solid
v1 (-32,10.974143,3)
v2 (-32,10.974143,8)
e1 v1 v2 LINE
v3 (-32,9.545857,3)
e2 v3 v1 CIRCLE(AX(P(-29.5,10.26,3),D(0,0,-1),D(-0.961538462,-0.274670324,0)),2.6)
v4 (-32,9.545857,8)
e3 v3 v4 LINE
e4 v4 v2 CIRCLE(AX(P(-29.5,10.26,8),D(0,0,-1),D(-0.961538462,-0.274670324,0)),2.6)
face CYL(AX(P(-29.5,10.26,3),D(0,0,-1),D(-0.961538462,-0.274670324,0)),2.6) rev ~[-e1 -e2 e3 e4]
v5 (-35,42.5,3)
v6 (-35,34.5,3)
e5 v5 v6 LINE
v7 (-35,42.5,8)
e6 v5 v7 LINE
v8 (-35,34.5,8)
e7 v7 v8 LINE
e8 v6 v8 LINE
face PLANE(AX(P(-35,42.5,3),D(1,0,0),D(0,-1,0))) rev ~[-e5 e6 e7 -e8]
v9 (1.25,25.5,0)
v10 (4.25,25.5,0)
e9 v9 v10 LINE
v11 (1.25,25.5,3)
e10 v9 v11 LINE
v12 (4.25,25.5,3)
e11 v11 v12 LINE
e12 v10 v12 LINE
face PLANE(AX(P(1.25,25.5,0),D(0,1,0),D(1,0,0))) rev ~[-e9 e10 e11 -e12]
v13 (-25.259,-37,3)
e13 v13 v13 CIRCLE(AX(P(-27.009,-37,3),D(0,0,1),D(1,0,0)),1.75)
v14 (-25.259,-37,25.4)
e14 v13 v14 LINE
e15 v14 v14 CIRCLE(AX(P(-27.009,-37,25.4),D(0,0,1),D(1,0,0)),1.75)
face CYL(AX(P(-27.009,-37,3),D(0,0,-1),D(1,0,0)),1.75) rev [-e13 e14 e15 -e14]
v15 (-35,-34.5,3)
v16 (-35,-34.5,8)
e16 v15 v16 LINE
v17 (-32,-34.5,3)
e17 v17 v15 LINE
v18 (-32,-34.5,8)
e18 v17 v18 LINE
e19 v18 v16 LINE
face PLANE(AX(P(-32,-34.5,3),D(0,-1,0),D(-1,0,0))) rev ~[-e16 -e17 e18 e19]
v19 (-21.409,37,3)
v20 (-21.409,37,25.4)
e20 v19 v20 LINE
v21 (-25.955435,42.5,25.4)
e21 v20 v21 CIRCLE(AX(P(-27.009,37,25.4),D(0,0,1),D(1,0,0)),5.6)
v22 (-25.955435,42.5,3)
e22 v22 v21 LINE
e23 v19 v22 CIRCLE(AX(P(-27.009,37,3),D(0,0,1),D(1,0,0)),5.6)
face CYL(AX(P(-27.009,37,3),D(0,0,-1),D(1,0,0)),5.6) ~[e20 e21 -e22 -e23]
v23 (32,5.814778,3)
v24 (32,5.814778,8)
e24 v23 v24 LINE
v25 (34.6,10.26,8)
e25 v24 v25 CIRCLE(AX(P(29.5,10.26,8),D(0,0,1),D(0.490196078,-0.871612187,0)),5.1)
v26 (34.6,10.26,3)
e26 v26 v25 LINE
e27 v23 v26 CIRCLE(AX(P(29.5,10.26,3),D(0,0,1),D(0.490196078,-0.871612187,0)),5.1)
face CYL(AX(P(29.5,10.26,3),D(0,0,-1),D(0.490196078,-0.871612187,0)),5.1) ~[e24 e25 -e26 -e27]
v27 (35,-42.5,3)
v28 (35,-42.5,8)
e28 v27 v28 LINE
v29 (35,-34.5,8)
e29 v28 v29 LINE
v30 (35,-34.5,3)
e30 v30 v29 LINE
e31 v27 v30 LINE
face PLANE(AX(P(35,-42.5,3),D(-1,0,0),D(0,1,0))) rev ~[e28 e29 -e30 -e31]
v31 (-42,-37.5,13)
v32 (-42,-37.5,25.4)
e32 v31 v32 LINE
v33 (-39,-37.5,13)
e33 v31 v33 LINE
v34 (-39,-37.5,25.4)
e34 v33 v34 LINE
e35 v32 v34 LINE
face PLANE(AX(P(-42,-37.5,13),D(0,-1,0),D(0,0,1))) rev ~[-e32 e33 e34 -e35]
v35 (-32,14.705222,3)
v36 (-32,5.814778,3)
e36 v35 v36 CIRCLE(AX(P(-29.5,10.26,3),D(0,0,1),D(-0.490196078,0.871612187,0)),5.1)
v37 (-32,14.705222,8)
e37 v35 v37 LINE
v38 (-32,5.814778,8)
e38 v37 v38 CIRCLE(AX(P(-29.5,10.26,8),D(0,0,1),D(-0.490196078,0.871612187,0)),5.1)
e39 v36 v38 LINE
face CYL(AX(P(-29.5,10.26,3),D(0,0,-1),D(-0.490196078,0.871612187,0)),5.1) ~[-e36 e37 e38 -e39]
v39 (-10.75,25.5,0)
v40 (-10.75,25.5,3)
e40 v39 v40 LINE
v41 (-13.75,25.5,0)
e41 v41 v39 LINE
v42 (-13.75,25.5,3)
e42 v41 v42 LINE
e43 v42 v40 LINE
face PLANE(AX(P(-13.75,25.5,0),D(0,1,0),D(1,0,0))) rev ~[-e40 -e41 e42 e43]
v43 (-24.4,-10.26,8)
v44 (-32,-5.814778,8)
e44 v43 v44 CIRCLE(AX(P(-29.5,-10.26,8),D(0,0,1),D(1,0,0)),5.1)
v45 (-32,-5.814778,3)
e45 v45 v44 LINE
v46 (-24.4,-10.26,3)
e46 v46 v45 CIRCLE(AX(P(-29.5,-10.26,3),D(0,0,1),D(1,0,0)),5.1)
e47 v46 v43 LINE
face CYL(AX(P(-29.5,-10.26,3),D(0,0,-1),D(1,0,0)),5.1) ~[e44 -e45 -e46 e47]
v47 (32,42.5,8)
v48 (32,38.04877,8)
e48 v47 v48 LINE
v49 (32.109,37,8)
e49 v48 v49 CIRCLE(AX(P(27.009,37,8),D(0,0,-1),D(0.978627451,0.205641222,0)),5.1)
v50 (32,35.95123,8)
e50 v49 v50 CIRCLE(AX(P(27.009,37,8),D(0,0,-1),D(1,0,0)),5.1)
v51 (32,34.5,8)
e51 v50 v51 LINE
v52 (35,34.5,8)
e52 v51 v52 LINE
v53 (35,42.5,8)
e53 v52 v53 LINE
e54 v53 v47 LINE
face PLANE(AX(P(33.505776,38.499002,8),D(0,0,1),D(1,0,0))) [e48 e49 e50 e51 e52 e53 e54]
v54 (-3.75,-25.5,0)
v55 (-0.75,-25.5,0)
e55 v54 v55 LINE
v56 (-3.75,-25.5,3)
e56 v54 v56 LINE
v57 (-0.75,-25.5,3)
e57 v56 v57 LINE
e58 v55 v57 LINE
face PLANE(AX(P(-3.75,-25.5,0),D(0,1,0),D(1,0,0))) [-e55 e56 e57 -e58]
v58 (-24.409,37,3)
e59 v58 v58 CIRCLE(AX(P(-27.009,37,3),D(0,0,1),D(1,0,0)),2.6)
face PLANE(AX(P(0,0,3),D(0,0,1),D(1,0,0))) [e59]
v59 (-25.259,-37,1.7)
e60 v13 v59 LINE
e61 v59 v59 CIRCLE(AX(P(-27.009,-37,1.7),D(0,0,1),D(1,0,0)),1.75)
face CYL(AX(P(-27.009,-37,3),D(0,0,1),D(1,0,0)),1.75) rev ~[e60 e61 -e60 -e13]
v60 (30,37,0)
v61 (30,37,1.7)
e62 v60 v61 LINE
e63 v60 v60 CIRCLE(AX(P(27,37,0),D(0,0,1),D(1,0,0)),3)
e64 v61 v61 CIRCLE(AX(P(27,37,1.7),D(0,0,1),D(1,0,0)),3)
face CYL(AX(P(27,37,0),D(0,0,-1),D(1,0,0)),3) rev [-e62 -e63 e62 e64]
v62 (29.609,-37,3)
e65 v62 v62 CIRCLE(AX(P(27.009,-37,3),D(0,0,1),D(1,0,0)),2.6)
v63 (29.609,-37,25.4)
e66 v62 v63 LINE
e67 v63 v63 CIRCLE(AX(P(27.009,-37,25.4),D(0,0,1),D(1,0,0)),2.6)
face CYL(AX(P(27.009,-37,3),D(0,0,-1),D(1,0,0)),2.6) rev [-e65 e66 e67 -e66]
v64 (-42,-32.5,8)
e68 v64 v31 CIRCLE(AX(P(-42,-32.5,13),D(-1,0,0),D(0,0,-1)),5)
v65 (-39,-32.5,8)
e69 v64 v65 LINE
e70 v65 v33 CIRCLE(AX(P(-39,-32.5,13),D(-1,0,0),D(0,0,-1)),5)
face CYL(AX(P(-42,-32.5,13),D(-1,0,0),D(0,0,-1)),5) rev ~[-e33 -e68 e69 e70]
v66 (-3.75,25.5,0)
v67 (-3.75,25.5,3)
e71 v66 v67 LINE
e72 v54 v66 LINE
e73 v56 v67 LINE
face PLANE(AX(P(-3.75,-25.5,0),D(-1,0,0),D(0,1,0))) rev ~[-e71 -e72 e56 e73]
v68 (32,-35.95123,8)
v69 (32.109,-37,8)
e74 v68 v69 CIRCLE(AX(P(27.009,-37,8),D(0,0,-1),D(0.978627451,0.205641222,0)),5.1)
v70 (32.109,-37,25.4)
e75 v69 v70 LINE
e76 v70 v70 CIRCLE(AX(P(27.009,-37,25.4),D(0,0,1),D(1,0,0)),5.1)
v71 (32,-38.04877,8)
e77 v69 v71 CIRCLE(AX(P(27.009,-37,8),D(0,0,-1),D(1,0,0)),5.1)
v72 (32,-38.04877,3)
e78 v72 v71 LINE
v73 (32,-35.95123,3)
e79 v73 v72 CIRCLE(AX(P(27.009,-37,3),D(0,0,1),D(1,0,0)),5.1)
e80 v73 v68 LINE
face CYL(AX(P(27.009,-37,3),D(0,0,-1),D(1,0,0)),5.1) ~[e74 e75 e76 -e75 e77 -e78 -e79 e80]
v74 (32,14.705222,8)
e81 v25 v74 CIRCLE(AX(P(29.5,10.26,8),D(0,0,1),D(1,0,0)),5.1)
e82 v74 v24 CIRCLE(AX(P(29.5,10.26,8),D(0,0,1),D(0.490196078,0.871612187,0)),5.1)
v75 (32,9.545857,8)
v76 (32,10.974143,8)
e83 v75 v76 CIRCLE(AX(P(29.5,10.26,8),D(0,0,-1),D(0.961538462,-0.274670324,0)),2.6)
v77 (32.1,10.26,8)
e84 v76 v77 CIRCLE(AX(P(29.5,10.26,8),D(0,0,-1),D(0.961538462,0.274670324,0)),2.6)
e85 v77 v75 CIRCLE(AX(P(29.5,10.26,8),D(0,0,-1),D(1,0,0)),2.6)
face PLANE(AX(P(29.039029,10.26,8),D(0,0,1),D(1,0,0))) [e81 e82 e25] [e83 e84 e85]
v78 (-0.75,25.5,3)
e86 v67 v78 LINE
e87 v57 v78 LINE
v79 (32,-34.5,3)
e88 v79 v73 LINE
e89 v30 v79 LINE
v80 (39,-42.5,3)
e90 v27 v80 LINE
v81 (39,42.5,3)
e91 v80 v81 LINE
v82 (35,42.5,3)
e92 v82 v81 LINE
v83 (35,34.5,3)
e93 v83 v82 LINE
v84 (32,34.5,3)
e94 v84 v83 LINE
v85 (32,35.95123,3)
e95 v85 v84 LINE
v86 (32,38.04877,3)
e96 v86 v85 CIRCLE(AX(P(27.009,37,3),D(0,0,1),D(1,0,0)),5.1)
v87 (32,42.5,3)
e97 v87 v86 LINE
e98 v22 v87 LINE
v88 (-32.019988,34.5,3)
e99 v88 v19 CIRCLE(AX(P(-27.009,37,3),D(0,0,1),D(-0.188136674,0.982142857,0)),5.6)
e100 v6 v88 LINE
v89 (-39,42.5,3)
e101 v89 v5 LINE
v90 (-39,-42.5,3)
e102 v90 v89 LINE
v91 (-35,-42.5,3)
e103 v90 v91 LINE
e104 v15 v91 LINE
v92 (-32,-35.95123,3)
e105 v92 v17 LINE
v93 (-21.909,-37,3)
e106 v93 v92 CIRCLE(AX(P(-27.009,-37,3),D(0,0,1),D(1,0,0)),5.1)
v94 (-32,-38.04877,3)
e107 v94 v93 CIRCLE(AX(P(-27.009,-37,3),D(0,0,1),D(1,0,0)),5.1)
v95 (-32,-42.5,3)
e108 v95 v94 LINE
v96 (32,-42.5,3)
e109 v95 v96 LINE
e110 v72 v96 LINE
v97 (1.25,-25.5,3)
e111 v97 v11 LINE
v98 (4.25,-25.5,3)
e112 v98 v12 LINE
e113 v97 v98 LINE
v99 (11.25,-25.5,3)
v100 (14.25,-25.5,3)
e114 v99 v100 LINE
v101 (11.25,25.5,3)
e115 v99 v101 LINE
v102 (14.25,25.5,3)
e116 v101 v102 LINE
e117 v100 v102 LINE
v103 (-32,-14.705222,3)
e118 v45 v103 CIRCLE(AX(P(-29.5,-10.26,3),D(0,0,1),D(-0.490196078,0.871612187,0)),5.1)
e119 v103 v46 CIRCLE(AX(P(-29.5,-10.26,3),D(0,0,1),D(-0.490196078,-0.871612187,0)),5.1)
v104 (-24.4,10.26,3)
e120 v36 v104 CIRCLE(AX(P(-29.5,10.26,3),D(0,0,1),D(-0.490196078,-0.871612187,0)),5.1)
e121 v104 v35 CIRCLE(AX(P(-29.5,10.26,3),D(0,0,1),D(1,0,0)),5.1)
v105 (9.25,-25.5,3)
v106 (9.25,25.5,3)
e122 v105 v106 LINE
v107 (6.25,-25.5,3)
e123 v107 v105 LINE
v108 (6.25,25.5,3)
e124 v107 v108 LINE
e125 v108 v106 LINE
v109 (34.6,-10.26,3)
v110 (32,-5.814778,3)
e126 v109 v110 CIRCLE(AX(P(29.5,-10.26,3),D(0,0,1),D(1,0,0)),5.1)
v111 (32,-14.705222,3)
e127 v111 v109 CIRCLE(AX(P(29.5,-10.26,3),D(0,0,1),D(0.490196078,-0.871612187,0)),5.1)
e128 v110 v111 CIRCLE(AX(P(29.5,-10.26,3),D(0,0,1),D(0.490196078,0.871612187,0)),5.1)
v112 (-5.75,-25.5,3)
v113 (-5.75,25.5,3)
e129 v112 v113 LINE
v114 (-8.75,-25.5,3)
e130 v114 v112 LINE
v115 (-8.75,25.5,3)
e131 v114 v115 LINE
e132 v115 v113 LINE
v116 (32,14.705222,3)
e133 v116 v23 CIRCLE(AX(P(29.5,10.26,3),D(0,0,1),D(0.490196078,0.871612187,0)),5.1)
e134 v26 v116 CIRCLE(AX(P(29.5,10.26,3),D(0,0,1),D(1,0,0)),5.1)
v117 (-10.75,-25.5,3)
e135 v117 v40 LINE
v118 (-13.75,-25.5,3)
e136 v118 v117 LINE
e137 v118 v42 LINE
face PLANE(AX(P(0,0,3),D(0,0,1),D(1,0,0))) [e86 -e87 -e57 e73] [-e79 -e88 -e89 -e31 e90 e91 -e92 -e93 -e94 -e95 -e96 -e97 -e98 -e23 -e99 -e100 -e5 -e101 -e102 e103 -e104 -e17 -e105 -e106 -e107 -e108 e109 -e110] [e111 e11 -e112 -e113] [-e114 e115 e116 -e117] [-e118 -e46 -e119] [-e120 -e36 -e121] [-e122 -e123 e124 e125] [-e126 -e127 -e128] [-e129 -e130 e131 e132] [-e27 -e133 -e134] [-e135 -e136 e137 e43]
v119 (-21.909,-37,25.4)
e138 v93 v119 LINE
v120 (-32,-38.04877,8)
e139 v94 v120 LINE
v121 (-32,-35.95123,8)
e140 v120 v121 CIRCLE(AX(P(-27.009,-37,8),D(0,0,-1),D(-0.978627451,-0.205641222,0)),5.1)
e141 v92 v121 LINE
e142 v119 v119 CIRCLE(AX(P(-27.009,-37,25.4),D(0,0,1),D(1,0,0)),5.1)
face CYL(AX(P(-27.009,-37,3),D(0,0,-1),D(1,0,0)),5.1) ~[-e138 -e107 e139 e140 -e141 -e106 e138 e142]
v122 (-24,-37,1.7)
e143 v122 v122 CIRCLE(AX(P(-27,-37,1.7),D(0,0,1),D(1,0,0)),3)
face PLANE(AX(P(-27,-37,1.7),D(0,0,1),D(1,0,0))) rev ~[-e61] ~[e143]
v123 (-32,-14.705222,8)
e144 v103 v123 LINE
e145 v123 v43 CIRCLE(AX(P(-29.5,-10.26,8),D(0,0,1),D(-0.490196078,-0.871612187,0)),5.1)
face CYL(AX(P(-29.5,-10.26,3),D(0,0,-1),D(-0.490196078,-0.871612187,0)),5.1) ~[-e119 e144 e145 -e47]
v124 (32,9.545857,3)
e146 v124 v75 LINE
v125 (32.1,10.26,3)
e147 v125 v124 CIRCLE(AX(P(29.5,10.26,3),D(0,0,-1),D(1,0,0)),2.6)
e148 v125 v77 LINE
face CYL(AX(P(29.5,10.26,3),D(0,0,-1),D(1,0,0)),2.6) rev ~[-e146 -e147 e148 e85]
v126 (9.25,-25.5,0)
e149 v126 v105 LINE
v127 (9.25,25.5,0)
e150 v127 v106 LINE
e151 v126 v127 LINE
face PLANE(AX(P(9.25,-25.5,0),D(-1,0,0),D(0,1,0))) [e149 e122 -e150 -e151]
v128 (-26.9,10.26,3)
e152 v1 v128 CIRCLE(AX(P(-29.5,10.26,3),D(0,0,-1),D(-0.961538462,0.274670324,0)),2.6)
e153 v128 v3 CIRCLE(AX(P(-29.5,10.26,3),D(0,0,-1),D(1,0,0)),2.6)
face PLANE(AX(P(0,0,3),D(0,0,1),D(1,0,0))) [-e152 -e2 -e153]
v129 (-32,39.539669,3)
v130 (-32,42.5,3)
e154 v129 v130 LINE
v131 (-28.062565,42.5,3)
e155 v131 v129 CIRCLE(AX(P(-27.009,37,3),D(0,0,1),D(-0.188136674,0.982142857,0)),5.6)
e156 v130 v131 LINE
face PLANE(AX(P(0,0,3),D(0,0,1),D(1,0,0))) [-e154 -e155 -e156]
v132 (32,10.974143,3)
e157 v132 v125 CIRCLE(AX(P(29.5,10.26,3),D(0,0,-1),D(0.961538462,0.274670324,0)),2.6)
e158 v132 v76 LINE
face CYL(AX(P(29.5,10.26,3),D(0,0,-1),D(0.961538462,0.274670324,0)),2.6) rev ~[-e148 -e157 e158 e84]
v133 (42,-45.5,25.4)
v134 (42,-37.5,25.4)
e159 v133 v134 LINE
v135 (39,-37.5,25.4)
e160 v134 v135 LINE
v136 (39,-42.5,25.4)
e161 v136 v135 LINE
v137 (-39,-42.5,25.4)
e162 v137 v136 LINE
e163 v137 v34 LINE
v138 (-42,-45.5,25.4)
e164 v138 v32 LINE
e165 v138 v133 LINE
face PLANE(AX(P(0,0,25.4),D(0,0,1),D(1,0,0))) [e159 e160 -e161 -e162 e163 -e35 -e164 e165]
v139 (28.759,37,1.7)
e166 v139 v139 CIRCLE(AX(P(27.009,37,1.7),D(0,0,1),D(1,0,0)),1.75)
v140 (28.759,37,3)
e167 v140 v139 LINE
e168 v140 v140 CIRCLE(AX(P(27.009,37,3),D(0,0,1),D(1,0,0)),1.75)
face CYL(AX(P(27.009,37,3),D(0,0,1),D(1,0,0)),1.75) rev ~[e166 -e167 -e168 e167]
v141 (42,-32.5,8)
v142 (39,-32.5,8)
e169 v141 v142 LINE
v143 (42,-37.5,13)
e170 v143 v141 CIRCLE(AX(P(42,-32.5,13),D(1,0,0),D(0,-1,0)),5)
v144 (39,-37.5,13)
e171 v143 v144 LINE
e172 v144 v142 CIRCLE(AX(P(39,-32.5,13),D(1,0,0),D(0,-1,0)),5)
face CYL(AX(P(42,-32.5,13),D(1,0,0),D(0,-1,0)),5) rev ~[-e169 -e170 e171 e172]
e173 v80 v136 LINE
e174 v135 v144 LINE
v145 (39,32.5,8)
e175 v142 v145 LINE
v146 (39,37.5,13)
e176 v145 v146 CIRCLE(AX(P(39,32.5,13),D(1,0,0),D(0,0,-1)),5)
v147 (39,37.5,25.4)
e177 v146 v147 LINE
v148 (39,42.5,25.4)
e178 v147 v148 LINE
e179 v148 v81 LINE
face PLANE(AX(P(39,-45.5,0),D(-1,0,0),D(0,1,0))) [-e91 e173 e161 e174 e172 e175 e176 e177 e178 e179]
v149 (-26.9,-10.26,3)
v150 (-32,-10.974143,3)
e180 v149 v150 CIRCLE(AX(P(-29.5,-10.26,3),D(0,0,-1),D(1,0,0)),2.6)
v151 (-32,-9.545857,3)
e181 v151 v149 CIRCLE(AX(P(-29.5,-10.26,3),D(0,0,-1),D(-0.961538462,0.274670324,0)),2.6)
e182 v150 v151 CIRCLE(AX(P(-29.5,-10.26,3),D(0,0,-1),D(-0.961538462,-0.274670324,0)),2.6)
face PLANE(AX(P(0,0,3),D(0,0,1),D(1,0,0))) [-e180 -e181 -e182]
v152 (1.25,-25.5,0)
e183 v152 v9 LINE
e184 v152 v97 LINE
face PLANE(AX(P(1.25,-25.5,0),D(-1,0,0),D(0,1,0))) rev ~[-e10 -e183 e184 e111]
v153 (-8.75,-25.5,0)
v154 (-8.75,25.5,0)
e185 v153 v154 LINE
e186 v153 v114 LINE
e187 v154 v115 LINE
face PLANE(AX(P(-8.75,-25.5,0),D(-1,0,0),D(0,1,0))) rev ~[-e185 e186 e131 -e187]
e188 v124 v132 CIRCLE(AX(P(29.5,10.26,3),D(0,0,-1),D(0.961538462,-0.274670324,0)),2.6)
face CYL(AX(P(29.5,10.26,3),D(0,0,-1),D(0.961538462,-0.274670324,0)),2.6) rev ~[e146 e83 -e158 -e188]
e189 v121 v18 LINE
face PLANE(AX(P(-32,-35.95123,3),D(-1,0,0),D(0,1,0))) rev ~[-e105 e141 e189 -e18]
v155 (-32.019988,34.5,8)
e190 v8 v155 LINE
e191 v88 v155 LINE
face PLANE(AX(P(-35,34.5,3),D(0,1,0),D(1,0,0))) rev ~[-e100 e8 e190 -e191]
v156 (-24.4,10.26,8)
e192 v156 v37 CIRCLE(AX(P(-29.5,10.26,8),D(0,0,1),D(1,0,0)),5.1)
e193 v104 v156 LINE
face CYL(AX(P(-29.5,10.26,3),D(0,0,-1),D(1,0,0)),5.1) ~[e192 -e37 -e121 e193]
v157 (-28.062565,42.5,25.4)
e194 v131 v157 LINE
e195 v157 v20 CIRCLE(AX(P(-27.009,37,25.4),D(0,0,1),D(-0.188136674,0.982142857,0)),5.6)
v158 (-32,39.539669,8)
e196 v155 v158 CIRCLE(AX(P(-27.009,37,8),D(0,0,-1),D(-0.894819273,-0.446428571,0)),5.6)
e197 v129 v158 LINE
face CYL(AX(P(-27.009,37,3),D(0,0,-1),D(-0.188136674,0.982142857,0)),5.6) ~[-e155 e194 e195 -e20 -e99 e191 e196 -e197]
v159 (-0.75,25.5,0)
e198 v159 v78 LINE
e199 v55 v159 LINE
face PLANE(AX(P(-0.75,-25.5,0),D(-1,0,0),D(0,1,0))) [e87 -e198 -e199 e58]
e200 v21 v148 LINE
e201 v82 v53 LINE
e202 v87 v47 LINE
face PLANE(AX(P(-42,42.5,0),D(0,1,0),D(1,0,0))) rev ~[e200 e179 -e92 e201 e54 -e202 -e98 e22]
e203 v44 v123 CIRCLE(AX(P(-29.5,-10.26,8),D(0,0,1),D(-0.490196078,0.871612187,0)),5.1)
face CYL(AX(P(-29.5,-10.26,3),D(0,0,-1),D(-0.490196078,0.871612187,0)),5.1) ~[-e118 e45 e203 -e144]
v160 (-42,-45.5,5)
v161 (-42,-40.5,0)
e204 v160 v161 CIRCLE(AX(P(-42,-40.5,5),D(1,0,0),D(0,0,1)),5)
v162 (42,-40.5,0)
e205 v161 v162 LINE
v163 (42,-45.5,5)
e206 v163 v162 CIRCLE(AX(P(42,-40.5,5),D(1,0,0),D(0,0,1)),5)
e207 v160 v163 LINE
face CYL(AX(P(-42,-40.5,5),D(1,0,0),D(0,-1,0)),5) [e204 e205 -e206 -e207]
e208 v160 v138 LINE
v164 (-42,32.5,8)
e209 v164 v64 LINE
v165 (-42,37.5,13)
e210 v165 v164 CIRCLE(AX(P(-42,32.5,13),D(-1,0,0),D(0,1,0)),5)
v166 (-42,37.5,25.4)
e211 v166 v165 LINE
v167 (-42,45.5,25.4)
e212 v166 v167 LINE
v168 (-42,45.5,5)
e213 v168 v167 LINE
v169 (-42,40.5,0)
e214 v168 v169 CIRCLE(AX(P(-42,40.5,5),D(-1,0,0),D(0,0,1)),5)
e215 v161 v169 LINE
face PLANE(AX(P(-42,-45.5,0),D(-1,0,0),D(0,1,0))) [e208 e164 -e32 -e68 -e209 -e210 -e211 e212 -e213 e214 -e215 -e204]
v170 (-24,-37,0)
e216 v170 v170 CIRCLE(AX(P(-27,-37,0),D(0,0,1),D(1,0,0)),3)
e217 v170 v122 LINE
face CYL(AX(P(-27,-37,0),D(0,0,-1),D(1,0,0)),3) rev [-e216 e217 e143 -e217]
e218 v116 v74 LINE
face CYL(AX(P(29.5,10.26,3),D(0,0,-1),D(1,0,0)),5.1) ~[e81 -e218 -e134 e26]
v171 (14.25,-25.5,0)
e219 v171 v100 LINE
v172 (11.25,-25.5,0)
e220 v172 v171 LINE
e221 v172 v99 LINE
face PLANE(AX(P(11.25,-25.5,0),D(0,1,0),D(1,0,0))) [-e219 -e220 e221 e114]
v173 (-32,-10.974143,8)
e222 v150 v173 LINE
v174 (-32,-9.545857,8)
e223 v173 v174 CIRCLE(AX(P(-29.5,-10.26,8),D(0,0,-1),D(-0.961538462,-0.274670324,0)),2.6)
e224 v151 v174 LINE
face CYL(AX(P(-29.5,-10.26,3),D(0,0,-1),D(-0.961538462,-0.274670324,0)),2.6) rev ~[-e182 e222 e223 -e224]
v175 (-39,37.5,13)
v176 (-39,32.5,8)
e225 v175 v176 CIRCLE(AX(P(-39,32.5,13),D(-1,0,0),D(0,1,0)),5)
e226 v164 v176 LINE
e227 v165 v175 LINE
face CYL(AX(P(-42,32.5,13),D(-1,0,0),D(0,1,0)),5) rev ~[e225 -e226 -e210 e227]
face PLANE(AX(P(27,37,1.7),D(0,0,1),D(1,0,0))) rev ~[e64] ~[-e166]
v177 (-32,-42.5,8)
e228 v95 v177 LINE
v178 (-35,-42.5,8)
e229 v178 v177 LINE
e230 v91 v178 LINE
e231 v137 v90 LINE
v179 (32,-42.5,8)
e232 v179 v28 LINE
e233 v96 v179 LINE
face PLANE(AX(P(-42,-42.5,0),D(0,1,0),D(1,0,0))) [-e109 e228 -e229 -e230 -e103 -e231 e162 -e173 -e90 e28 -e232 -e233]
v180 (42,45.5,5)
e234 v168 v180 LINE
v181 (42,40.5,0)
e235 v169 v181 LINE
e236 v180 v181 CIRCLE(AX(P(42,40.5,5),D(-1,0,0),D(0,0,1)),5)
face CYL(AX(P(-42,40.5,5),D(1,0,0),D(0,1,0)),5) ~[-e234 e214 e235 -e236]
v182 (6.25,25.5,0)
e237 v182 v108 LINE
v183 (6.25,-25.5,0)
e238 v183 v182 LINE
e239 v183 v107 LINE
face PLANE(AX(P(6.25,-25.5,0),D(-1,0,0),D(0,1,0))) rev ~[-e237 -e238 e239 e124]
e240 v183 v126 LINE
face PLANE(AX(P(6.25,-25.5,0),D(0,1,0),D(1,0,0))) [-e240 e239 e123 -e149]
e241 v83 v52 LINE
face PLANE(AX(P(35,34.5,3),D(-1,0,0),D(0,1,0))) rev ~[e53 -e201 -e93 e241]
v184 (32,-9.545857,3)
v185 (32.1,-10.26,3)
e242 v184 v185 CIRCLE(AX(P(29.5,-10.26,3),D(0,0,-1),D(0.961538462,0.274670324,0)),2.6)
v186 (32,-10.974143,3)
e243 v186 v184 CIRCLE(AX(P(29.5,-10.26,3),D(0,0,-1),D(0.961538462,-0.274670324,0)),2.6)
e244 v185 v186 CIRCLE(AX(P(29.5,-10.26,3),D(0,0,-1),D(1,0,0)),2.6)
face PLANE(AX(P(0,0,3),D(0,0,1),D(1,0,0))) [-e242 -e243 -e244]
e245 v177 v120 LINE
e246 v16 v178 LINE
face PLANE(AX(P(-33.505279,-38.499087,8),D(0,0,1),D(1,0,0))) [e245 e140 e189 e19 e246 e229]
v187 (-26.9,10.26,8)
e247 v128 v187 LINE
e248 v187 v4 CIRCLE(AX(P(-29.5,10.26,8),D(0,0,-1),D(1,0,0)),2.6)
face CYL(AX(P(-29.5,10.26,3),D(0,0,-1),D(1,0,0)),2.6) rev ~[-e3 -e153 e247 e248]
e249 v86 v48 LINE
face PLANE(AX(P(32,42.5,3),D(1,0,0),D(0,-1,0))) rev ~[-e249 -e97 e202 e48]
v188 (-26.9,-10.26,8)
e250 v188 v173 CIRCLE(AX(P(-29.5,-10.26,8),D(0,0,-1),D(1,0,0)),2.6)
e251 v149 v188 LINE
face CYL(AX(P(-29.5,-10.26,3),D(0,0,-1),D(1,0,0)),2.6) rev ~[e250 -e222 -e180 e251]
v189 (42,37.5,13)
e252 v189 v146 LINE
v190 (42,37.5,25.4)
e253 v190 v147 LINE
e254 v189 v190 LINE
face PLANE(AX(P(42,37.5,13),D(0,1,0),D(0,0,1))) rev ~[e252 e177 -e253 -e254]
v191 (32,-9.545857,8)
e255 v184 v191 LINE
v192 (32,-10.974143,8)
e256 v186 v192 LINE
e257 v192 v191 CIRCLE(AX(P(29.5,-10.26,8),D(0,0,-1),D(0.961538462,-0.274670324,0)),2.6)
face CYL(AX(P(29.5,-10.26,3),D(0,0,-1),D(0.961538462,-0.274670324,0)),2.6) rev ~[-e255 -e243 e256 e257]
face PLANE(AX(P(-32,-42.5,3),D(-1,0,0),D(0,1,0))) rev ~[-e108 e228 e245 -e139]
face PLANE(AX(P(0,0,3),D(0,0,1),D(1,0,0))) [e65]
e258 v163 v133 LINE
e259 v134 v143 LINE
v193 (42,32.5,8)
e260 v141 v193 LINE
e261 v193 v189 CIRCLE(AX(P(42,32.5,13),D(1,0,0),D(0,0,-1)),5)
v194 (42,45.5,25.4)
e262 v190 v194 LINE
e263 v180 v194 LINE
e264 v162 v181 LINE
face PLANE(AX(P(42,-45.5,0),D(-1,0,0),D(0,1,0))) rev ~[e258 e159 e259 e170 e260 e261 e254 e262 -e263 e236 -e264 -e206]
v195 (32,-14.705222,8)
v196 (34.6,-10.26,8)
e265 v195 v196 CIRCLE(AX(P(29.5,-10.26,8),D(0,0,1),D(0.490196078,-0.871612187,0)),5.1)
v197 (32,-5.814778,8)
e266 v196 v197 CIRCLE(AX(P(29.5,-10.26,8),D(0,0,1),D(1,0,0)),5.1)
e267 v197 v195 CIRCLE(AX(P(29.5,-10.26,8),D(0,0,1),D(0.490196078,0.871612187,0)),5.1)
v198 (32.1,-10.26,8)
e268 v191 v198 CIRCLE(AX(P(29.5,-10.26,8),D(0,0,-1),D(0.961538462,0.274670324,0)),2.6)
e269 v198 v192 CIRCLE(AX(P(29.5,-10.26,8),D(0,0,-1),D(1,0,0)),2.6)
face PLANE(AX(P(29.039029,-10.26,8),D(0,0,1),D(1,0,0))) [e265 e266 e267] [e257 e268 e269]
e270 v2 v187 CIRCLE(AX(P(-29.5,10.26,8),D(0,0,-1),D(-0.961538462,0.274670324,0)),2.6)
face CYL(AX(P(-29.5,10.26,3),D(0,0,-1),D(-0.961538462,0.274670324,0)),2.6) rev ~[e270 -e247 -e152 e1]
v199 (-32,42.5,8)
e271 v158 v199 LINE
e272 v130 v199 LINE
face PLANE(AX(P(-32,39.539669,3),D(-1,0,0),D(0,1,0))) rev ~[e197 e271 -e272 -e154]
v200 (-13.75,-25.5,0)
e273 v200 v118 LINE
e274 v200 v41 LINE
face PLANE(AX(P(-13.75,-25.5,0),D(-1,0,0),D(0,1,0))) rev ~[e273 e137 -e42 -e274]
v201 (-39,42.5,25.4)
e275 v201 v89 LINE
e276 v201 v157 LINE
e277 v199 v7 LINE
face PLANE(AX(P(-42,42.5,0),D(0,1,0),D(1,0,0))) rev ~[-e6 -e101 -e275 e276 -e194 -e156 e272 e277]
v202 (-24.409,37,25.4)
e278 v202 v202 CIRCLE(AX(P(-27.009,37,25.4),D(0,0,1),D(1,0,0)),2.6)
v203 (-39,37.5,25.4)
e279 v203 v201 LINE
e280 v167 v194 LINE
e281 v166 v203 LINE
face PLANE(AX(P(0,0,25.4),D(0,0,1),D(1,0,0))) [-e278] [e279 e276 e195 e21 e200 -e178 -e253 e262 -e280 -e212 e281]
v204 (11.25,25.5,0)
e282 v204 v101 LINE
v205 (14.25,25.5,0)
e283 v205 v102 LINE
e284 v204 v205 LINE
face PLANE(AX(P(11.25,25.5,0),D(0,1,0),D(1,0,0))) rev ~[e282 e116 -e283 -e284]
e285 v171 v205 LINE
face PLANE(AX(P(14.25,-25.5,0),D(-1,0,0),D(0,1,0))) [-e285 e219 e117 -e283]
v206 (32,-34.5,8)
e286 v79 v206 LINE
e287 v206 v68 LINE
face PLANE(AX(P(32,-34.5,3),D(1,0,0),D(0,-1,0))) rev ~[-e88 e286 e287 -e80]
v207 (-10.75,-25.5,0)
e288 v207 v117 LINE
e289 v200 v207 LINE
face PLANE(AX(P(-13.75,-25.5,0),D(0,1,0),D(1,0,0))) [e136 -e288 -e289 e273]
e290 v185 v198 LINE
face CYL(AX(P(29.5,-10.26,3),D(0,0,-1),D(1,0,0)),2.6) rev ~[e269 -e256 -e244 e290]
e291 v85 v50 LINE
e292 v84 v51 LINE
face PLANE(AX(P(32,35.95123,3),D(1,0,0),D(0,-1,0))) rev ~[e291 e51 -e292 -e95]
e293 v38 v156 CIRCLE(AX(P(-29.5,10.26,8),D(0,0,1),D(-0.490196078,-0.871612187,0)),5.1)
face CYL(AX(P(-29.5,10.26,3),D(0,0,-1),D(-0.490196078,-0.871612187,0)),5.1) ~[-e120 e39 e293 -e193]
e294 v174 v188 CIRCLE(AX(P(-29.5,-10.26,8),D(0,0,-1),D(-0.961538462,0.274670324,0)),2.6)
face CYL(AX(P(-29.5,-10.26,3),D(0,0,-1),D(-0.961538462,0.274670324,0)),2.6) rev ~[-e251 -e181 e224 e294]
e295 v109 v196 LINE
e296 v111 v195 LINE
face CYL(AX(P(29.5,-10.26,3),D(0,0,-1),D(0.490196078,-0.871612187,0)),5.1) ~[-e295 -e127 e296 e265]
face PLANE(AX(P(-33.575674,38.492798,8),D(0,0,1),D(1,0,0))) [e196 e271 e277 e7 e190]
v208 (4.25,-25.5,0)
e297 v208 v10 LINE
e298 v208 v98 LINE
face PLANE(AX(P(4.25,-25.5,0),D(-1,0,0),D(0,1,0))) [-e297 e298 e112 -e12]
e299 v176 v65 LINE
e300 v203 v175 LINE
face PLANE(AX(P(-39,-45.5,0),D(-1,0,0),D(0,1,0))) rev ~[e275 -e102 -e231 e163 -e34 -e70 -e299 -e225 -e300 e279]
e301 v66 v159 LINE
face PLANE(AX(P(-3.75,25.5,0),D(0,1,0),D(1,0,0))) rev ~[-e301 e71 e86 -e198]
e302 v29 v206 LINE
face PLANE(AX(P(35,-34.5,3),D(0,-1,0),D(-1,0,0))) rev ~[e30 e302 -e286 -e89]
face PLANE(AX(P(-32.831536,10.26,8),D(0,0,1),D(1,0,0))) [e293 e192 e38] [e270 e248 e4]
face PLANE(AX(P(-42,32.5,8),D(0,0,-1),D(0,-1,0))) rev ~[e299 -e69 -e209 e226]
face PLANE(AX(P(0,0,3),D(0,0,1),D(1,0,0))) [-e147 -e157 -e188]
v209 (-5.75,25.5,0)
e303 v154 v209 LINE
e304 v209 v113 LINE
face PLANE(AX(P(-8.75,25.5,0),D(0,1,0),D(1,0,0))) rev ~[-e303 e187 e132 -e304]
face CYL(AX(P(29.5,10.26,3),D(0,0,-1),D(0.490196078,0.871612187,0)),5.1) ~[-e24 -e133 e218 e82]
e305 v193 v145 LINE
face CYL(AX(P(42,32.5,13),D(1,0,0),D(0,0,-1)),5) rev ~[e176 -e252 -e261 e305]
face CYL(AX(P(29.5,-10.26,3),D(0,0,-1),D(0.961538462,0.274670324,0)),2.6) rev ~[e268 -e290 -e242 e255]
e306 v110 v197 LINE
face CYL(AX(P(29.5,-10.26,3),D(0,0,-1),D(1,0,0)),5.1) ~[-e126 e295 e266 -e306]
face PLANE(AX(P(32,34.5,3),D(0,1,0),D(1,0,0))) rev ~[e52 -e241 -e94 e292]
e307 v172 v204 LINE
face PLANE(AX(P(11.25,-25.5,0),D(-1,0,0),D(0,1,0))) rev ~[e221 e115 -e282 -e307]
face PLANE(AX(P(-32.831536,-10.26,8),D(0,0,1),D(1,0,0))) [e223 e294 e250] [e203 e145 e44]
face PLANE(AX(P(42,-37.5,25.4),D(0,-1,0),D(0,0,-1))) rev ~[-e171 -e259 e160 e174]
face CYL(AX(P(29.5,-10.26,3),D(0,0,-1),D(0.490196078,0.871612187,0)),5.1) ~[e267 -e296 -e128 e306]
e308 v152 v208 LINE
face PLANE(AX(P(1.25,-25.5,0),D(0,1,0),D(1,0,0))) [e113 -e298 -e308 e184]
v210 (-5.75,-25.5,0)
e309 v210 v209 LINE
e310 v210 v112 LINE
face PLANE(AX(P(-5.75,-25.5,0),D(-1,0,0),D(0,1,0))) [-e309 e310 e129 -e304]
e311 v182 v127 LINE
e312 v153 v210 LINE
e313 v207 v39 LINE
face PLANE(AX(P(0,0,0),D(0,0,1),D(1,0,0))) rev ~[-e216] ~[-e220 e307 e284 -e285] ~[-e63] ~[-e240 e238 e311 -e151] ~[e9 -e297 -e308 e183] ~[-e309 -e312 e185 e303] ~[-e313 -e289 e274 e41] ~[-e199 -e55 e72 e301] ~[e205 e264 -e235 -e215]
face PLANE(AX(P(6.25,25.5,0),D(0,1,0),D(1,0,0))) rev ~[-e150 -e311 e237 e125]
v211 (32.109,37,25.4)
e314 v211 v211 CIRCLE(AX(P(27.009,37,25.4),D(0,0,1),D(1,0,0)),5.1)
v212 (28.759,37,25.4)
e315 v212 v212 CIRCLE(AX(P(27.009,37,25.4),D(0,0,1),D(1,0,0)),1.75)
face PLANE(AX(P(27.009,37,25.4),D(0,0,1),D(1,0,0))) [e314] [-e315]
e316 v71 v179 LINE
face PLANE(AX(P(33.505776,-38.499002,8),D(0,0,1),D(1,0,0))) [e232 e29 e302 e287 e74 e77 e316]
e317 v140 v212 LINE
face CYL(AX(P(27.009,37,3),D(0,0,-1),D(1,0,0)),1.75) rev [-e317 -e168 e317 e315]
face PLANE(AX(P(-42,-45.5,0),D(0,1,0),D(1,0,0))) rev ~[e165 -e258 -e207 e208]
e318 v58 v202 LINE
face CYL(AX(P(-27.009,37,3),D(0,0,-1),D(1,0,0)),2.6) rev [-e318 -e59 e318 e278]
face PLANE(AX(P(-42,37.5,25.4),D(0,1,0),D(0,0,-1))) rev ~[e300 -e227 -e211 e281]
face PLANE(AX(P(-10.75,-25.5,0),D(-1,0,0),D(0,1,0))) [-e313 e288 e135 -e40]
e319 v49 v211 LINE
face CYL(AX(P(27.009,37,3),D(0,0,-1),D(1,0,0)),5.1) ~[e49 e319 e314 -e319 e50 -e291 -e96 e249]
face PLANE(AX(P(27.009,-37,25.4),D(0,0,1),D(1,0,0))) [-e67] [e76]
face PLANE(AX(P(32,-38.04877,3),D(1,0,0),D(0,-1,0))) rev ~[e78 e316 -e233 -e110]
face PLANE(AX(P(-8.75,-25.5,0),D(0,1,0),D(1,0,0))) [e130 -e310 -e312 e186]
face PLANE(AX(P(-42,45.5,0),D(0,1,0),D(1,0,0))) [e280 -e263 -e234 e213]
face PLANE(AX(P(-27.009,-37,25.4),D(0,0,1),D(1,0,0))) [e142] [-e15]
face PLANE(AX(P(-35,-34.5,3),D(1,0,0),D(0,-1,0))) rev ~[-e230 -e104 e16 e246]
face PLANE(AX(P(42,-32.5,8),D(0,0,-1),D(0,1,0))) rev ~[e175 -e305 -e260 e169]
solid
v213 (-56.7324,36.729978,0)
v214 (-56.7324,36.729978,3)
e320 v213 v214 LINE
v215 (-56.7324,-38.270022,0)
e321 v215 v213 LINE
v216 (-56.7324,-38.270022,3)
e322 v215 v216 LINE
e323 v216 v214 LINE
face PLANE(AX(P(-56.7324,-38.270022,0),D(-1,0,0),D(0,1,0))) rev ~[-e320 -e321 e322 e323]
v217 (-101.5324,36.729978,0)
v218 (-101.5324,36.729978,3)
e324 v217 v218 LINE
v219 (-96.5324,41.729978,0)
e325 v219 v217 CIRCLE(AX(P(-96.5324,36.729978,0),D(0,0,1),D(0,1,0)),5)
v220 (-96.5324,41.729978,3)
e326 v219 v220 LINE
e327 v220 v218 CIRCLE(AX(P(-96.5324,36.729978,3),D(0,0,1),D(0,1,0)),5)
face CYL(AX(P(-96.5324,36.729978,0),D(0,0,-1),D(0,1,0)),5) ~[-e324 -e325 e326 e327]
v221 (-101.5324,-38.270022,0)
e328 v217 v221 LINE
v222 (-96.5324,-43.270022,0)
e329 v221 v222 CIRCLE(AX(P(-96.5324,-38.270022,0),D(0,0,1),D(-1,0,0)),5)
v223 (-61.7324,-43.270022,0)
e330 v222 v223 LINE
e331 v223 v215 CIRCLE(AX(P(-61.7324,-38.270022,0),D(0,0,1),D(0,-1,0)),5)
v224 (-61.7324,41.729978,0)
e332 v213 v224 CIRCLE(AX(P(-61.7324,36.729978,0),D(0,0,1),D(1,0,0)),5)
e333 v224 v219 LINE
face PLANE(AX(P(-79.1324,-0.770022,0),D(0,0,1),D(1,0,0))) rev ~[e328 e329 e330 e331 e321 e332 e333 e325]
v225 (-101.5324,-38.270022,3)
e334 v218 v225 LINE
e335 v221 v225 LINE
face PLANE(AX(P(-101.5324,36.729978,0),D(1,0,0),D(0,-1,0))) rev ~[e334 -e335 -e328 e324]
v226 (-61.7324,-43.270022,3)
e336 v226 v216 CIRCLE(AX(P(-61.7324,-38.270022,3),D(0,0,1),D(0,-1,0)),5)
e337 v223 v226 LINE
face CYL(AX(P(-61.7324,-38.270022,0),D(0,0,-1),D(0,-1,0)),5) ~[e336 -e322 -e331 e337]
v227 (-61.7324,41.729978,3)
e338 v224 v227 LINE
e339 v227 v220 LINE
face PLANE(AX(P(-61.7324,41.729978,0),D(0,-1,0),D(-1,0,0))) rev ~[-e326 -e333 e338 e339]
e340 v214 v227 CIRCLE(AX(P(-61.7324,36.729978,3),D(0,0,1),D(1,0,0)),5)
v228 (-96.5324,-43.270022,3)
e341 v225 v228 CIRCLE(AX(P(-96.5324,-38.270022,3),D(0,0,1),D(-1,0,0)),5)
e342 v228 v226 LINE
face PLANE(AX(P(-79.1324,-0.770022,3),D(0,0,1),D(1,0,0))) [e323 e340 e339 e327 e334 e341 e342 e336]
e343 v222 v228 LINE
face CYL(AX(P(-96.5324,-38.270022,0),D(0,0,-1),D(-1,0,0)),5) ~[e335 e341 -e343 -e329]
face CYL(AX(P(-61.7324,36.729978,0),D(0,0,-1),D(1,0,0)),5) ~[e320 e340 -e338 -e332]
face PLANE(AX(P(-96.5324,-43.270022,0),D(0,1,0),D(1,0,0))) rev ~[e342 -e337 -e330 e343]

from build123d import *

# Parameters (mm, degrees)
F2_W      = 84
F2_H      = 91
F3_DEPTH  = 25.4
F4_T      = -3
F5_R      = 2.6
F5_R_2    = 5.1
F5_R_3    = 1.75
F6_DEPTH  = 22.4
F7_DEPTH  = 5
F9_DEPTH  = 5
F11_DEPTH = 5
F13_R     = 3
F14_DEPTH = 1.7
F15_R     = 5
F17_DEPTH = 3
F19_DEPTH = 3
F20_W     = 3
F20_H     = 51
F21_DEPTH = 3
F23_DEPTH = 3


with BuildPart() as f3:
    # F2 (on Top) → F3 (new body)
    with BuildSketch(Plane.XY):
        Rectangle(F2_W, F2_H)
    extrude(amount=F3_DEPTH)

    # F4
    f4_openings = [f3.faces().sort_by_distance(p)[0] for p in [
        (0, 0, 25.4),
    ]]
    offset(amount=F4_T, openings=f4_openings)

    # F5 (on face) → F6 (join, through all)
    with BuildSketch(Plane.XY.offset(3)):
        with BuildLine():
            ThreePointArc((-28.0625653753, 42.5), (-30.5769149302, 32.6837535924), (-21.409, 37))
            ThreePointArc((-21.409, 37), (-22.6927535924, 40.5679149302), (-25.9554346247, 42.5))
            Line((-25.9554346247, 42.5), (-28.0625653753, 42.5))
        make_face()
        with Locations((-27.009, 37)):
            Circle(F5_R, mode=Mode.SUBTRACT)
        with Locations((27.009, 37)):
            Circle(F5_R_2)
        with Locations((27.009, 37)):
            Circle(F5_R_3, mode=Mode.SUBTRACT)
        with Locations((-27.009, -37)):
            Circle(F5_R_2)
        with Locations((-27.009, -37)):
            Circle(F5_R_3, mode=Mode.SUBTRACT)
        with Locations((27.009, -37)):
            Circle(F5_R_2)
        with Locations((27.009, -37)):
            Circle(F5_R, mode=Mode.SUBTRACT)
    extrude(amount=F6_DEPTH)

    # F7 (cut): faces of the model
    f7_faces = [f3.faces().sort_by_distance(p)[0] for p in [
        (27.009, 37, 3),
        (-27.009, -37, 3),
    ]]
    extrude(f7_faces, amount=-F7_DEPTH, mode=Mode.SUBTRACT)

    # F8 (on face) → F9 (join)
    with BuildSketch(Plane.XY.offset(3)):
        with BuildLine():
            Line((-32, 42.5), (-35, 42.5))
            Line((-35, 42.5), (-35, 34.5))
            Line((-35, 34.5), (-32.0199879265, 34.5))
            ThreePointArc((-32.0199879265, 34.5), (-32.6089559562, 37.0222100909), (-32, 39.5396690729))
            Line((-32, 39.5396690729), (-32, 42.5))
        make_face()
        with BuildLine():
            Line((35, 42.5), (32, 42.5))
            Line((32, 42.5), (32, 38.0487702322))
            ThreePointArc((32, 38.0487702322), (32.0816768082, 37.5272096357), (32.109, 37))
            ThreePointArc((32.109, 37), (32.0816768082, 36.4727903643), (32, 35.9512297678))
            Line((32, 35.9512297678), (32, 34.5))
            Line((32, 34.5), (35, 34.5))
            Line((35, 34.5), (35, 42.5))
        make_face()
        with BuildLine():
            Line((32, -38.0487702322), (32, -42.5))
            Line((32, -42.5), (35, -42.5))
            Line((35, -42.5), (35, -34.5))
            Line((35, -34.5), (32, -34.5))
            Line((32, -34.5), (32, -35.9512297678))
            ThreePointArc((32, -35.9512297678), (32.0816768082, -36.4727903643), (32.109, -37))
            ThreePointArc((32.109, -37), (32.0816768082, -37.5272096357), (32, -38.0487702322))
        make_face()
        with BuildLine():
            Line((-35, -34.5), (-35, -42.5))
            Line((-35, -42.5), (-32, -42.5))
            Line((-32, -42.5), (-32, -38.0487702322))
            ThreePointArc((-32, -38.0487702322), (-32.109, -37), (-32, -35.9512297678))
            Line((-32, -35.9512297678), (-32, -34.5))
            Line((-32, -34.5), (-35, -34.5))
        make_face()
    extrude(amount=F9_DEPTH)

    # F10 (on face) → F11 (join)
    with BuildSketch(Plane.XY.offset(3)):
        with BuildLine():
            Line((-32, 10.9741428429), (-32, 14.7052221542))
            ThreePointArc((-32, 14.7052221542), (-34.6, 10.26), (-32, 5.8147778458))
            Line((-32, 5.8147778458), (-32, 9.5458571571))
            ThreePointArc((-32, 9.5458571571), (-32.1, 10.26), (-32, 10.9741428429))
        make_face()
        with BuildLine():
            ThreePointArc((-24.4, 10.26), (-26.9251213621, 14.6622721406), (-32, 14.7052221542))
            Line((-32, 14.7052221542), (-32, 10.9741428429))
            ThreePointArc((-32, 10.9741428429), (-29.1394448725, 12.8348786379), (-26.9, 10.26))
            ThreePointArc((-26.9, 10.26), (-29.1394448725, 7.6851213621), (-32, 9.5458571571))
            Line((-32, 9.5458571571), (-32, 5.8147778458))
            ThreePointArc((-32, 5.8147778458), (-26.9251213621, 5.8577278594), (-24.4, 10.26))
        make_face()
        with BuildLine():
            Line((32, 10.9741428429), (32, 14.7052221542))
            ThreePointArc((32, 14.7052221542), (24.4, 10.26), (32, 5.8147778458))
            Line((32, 5.8147778458), (32, 9.5458571571))
            ThreePointArc((32, 9.5458571571), (26.9, 10.26), (32, 10.9741428429))
        make_face()
        with BuildLine():
            ThreePointArc((34.6, 10.26), (33.9022721406, 12.8348786379), (32, 14.7052221542))
            Line((32, 14.7052221542), (32, 10.9741428429))
            ThreePointArc((32, 10.9741428429), (32.0748786379, 10.6205551275), (32.1, 10.26))
            ThreePointArc((32.1, 10.26), (32.0748786379, 9.8994448725), (32, 9.5458571571))
            Line((32, 9.5458571571), (32, 5.8147778458))
            ThreePointArc((32, 5.8147778458), (33.9022721406, 7.6851213621), (34.6, 10.26))
        make_face()
        with BuildLine():
            Line((32, -9.5458571571), (32, -5.8147778458))
            ThreePointArc((32, -5.8147778458), (24.4, -10.26), (32, -14.7052221542))
            Line((32, -14.7052221542), (32, -10.9741428429))
            ThreePointArc((32, -10.9741428429), (26.9, -10.26), (32, -9.5458571571))
        make_face()
        with BuildLine():
            ThreePointArc((34.6, -10.26), (33.9022721406, -7.6851213621), (32, -5.8147778458))
            Line((32, -5.8147778458), (32, -9.5458571571))
            ThreePointArc((32, -9.5458571571), (32.0748786379, -9.8994448725), (32.1, -10.26))
            ThreePointArc((32.1, -10.26), (32.0748786379, -10.6205551275), (32, -10.9741428429))
            Line((32, -10.9741428429), (32, -14.7052221542))
            ThreePointArc((32, -14.7052221542), (33.9022721406, -12.8348786379), (34.6, -10.26))
        make_face()
        with BuildLine():
            Line((-32, -9.5458571571), (-32, -5.8147778458))
            ThreePointArc((-32, -5.8147778458), (-34.6, -10.26), (-32, -14.7052221542))
            Line((-32, -14.7052221542), (-32, -10.9741428429))
            ThreePointArc((-32, -10.9741428429), (-32.1, -10.26), (-32, -9.5458571571))
        make_face()
        with BuildLine():
            ThreePointArc((-24.4, -10.26), (-26.9251213621, -5.8577278594), (-32, -5.8147778458))
            Line((-32, -5.8147778458), (-32, -9.5458571571))
            ThreePointArc((-32, -9.5458571571), (-29.1394448725, -7.6851213621), (-26.9, -10.26))
            ThreePointArc((-26.9, -10.26), (-29.1394448725, -12.8348786379), (-32, -10.9741428429))
            Line((-32, -10.9741428429), (-32, -14.7052221542))
            ThreePointArc((-32, -14.7052221542), (-26.9251213621, -14.6622721406), (-24.4, -10.26))
        make_face()
    extrude(amount=F11_DEPTH)

    # F13 (on face) → F14 (cut)
    with BuildSketch(Plane.XY):
        with Locations((-27, -37)):
            Circle(F13_R)
        with Locations((27, 37)):
            Circle(F13_R)
    extrude(amount=F14_DEPTH, mode=Mode.SUBTRACT)

    # F15
    f15_edges = [f3.edges().sort_by_distance(p)[0] for p in [
        (0, -45.5, 0),
        (0, 45.5, 0),
    ]]
    fillet(f15_edges, radius=F15_R)

    # F16 (on face) → F17 (cut)
    with BuildSketch(Plane(origin=(-42, 0, 0), x_dir=(0, -1, 0), z_dir=(-1, 0, 0))):
        with BuildLine():
            Line((-32.5, 8), (32.5, 8))
            ThreePointArc((32.5, 8), (36.0355339059, 9.4644660941), (37.5, 13))
            Line((37.5, 13), (37.5, 25.4))
            Line((37.5, 25.4), (-37.5, 25.4))
            Line((-37.5, 25.4), (-37.5, 13))
            ThreePointArc((-37.5, 13), (-36.0355339059, 9.4644660941), (-32.5, 8))
        make_face()
    extrude(amount=-F17_DEPTH, mode=Mode.SUBTRACT)

    # F18 (on face) → F19 (cut)
    with BuildSketch(Plane.YZ.offset(42)):
        with BuildLine():
            Line((37.5, 25.4), (-37.5, 25.4))
            Line((-37.5, 25.4), (-37.5, 13))
            ThreePointArc((-37.5, 13), (-36.0355339059, 9.4644660941), (-32.5, 8))
            Line((-32.5, 8), (32.5, 8))
            ThreePointArc((32.5, 8), (36.0355339059, 9.4644660941), (37.5, 13))
            Line((37.5, 13), (37.5, 25.4))
        make_face()
    extrude(amount=-F19_DEPTH, mode=Mode.SUBTRACT)

    # F20 (on face) → F21 (cut)
    with BuildSketch(Plane.XY):
        with Locations((-12.25, 0)):
            Rectangle(F20_W, F20_H)
        with Locations((-7.25, 0)):
            Rectangle(F20_W, F20_H)
        with Locations((-2.25, 0)):
            Rectangle(F20_W, F20_H)
        with Locations((2.75, 0)):
            Rectangle(F20_W, F20_H)
        with Locations((7.75, 0)):
            Rectangle(F20_W, F20_H)
        with Locations((12.75, 0)):
            Rectangle(F20_W, F20_H)
    extrude(amount=F21_DEPTH, mode=Mode.SUBTRACT)


with BuildPart() as f23:
    # F22 (on Top) → F23 (new body)
    with BuildSketch(Plane.XY):
        with BuildLine():
            ThreePointArc((-56.7323996544, 36.729978323), (-58.1968657485, 40.2655122289), (-61.7323996544, 41.729978323))
            Line((-61.7323996544, 41.729978323), (-96.5323996544, 41.729978323))
            ThreePointArc((-96.5323996544, 41.729978323), (-100.0679335603, 40.2655122289), (-101.5323996544, 36.729978323))
            Line((-101.5323996544, 36.729978323), (-101.5323996544, -38.270021677))
            ThreePointArc((-101.5323996544, -38.270021677), (-100.0679335603, -41.8055555829), (-96.5323996544, -43.270021677))
            Line((-96.5323996544, -43.270021677), (-61.7323996544, -43.270021677))
            ThreePointArc((-61.7323996544, -43.270021677), (-58.1968657485, -41.8055555829), (-56.7323996544, -38.270021677))
            Line((-56.7323996544, -38.270021677), (-56.7323996544, 36.729978323))
        make_face()
    extrude(amount=F23_DEPTH)


solid = Compound([f3.part, f23.part])
